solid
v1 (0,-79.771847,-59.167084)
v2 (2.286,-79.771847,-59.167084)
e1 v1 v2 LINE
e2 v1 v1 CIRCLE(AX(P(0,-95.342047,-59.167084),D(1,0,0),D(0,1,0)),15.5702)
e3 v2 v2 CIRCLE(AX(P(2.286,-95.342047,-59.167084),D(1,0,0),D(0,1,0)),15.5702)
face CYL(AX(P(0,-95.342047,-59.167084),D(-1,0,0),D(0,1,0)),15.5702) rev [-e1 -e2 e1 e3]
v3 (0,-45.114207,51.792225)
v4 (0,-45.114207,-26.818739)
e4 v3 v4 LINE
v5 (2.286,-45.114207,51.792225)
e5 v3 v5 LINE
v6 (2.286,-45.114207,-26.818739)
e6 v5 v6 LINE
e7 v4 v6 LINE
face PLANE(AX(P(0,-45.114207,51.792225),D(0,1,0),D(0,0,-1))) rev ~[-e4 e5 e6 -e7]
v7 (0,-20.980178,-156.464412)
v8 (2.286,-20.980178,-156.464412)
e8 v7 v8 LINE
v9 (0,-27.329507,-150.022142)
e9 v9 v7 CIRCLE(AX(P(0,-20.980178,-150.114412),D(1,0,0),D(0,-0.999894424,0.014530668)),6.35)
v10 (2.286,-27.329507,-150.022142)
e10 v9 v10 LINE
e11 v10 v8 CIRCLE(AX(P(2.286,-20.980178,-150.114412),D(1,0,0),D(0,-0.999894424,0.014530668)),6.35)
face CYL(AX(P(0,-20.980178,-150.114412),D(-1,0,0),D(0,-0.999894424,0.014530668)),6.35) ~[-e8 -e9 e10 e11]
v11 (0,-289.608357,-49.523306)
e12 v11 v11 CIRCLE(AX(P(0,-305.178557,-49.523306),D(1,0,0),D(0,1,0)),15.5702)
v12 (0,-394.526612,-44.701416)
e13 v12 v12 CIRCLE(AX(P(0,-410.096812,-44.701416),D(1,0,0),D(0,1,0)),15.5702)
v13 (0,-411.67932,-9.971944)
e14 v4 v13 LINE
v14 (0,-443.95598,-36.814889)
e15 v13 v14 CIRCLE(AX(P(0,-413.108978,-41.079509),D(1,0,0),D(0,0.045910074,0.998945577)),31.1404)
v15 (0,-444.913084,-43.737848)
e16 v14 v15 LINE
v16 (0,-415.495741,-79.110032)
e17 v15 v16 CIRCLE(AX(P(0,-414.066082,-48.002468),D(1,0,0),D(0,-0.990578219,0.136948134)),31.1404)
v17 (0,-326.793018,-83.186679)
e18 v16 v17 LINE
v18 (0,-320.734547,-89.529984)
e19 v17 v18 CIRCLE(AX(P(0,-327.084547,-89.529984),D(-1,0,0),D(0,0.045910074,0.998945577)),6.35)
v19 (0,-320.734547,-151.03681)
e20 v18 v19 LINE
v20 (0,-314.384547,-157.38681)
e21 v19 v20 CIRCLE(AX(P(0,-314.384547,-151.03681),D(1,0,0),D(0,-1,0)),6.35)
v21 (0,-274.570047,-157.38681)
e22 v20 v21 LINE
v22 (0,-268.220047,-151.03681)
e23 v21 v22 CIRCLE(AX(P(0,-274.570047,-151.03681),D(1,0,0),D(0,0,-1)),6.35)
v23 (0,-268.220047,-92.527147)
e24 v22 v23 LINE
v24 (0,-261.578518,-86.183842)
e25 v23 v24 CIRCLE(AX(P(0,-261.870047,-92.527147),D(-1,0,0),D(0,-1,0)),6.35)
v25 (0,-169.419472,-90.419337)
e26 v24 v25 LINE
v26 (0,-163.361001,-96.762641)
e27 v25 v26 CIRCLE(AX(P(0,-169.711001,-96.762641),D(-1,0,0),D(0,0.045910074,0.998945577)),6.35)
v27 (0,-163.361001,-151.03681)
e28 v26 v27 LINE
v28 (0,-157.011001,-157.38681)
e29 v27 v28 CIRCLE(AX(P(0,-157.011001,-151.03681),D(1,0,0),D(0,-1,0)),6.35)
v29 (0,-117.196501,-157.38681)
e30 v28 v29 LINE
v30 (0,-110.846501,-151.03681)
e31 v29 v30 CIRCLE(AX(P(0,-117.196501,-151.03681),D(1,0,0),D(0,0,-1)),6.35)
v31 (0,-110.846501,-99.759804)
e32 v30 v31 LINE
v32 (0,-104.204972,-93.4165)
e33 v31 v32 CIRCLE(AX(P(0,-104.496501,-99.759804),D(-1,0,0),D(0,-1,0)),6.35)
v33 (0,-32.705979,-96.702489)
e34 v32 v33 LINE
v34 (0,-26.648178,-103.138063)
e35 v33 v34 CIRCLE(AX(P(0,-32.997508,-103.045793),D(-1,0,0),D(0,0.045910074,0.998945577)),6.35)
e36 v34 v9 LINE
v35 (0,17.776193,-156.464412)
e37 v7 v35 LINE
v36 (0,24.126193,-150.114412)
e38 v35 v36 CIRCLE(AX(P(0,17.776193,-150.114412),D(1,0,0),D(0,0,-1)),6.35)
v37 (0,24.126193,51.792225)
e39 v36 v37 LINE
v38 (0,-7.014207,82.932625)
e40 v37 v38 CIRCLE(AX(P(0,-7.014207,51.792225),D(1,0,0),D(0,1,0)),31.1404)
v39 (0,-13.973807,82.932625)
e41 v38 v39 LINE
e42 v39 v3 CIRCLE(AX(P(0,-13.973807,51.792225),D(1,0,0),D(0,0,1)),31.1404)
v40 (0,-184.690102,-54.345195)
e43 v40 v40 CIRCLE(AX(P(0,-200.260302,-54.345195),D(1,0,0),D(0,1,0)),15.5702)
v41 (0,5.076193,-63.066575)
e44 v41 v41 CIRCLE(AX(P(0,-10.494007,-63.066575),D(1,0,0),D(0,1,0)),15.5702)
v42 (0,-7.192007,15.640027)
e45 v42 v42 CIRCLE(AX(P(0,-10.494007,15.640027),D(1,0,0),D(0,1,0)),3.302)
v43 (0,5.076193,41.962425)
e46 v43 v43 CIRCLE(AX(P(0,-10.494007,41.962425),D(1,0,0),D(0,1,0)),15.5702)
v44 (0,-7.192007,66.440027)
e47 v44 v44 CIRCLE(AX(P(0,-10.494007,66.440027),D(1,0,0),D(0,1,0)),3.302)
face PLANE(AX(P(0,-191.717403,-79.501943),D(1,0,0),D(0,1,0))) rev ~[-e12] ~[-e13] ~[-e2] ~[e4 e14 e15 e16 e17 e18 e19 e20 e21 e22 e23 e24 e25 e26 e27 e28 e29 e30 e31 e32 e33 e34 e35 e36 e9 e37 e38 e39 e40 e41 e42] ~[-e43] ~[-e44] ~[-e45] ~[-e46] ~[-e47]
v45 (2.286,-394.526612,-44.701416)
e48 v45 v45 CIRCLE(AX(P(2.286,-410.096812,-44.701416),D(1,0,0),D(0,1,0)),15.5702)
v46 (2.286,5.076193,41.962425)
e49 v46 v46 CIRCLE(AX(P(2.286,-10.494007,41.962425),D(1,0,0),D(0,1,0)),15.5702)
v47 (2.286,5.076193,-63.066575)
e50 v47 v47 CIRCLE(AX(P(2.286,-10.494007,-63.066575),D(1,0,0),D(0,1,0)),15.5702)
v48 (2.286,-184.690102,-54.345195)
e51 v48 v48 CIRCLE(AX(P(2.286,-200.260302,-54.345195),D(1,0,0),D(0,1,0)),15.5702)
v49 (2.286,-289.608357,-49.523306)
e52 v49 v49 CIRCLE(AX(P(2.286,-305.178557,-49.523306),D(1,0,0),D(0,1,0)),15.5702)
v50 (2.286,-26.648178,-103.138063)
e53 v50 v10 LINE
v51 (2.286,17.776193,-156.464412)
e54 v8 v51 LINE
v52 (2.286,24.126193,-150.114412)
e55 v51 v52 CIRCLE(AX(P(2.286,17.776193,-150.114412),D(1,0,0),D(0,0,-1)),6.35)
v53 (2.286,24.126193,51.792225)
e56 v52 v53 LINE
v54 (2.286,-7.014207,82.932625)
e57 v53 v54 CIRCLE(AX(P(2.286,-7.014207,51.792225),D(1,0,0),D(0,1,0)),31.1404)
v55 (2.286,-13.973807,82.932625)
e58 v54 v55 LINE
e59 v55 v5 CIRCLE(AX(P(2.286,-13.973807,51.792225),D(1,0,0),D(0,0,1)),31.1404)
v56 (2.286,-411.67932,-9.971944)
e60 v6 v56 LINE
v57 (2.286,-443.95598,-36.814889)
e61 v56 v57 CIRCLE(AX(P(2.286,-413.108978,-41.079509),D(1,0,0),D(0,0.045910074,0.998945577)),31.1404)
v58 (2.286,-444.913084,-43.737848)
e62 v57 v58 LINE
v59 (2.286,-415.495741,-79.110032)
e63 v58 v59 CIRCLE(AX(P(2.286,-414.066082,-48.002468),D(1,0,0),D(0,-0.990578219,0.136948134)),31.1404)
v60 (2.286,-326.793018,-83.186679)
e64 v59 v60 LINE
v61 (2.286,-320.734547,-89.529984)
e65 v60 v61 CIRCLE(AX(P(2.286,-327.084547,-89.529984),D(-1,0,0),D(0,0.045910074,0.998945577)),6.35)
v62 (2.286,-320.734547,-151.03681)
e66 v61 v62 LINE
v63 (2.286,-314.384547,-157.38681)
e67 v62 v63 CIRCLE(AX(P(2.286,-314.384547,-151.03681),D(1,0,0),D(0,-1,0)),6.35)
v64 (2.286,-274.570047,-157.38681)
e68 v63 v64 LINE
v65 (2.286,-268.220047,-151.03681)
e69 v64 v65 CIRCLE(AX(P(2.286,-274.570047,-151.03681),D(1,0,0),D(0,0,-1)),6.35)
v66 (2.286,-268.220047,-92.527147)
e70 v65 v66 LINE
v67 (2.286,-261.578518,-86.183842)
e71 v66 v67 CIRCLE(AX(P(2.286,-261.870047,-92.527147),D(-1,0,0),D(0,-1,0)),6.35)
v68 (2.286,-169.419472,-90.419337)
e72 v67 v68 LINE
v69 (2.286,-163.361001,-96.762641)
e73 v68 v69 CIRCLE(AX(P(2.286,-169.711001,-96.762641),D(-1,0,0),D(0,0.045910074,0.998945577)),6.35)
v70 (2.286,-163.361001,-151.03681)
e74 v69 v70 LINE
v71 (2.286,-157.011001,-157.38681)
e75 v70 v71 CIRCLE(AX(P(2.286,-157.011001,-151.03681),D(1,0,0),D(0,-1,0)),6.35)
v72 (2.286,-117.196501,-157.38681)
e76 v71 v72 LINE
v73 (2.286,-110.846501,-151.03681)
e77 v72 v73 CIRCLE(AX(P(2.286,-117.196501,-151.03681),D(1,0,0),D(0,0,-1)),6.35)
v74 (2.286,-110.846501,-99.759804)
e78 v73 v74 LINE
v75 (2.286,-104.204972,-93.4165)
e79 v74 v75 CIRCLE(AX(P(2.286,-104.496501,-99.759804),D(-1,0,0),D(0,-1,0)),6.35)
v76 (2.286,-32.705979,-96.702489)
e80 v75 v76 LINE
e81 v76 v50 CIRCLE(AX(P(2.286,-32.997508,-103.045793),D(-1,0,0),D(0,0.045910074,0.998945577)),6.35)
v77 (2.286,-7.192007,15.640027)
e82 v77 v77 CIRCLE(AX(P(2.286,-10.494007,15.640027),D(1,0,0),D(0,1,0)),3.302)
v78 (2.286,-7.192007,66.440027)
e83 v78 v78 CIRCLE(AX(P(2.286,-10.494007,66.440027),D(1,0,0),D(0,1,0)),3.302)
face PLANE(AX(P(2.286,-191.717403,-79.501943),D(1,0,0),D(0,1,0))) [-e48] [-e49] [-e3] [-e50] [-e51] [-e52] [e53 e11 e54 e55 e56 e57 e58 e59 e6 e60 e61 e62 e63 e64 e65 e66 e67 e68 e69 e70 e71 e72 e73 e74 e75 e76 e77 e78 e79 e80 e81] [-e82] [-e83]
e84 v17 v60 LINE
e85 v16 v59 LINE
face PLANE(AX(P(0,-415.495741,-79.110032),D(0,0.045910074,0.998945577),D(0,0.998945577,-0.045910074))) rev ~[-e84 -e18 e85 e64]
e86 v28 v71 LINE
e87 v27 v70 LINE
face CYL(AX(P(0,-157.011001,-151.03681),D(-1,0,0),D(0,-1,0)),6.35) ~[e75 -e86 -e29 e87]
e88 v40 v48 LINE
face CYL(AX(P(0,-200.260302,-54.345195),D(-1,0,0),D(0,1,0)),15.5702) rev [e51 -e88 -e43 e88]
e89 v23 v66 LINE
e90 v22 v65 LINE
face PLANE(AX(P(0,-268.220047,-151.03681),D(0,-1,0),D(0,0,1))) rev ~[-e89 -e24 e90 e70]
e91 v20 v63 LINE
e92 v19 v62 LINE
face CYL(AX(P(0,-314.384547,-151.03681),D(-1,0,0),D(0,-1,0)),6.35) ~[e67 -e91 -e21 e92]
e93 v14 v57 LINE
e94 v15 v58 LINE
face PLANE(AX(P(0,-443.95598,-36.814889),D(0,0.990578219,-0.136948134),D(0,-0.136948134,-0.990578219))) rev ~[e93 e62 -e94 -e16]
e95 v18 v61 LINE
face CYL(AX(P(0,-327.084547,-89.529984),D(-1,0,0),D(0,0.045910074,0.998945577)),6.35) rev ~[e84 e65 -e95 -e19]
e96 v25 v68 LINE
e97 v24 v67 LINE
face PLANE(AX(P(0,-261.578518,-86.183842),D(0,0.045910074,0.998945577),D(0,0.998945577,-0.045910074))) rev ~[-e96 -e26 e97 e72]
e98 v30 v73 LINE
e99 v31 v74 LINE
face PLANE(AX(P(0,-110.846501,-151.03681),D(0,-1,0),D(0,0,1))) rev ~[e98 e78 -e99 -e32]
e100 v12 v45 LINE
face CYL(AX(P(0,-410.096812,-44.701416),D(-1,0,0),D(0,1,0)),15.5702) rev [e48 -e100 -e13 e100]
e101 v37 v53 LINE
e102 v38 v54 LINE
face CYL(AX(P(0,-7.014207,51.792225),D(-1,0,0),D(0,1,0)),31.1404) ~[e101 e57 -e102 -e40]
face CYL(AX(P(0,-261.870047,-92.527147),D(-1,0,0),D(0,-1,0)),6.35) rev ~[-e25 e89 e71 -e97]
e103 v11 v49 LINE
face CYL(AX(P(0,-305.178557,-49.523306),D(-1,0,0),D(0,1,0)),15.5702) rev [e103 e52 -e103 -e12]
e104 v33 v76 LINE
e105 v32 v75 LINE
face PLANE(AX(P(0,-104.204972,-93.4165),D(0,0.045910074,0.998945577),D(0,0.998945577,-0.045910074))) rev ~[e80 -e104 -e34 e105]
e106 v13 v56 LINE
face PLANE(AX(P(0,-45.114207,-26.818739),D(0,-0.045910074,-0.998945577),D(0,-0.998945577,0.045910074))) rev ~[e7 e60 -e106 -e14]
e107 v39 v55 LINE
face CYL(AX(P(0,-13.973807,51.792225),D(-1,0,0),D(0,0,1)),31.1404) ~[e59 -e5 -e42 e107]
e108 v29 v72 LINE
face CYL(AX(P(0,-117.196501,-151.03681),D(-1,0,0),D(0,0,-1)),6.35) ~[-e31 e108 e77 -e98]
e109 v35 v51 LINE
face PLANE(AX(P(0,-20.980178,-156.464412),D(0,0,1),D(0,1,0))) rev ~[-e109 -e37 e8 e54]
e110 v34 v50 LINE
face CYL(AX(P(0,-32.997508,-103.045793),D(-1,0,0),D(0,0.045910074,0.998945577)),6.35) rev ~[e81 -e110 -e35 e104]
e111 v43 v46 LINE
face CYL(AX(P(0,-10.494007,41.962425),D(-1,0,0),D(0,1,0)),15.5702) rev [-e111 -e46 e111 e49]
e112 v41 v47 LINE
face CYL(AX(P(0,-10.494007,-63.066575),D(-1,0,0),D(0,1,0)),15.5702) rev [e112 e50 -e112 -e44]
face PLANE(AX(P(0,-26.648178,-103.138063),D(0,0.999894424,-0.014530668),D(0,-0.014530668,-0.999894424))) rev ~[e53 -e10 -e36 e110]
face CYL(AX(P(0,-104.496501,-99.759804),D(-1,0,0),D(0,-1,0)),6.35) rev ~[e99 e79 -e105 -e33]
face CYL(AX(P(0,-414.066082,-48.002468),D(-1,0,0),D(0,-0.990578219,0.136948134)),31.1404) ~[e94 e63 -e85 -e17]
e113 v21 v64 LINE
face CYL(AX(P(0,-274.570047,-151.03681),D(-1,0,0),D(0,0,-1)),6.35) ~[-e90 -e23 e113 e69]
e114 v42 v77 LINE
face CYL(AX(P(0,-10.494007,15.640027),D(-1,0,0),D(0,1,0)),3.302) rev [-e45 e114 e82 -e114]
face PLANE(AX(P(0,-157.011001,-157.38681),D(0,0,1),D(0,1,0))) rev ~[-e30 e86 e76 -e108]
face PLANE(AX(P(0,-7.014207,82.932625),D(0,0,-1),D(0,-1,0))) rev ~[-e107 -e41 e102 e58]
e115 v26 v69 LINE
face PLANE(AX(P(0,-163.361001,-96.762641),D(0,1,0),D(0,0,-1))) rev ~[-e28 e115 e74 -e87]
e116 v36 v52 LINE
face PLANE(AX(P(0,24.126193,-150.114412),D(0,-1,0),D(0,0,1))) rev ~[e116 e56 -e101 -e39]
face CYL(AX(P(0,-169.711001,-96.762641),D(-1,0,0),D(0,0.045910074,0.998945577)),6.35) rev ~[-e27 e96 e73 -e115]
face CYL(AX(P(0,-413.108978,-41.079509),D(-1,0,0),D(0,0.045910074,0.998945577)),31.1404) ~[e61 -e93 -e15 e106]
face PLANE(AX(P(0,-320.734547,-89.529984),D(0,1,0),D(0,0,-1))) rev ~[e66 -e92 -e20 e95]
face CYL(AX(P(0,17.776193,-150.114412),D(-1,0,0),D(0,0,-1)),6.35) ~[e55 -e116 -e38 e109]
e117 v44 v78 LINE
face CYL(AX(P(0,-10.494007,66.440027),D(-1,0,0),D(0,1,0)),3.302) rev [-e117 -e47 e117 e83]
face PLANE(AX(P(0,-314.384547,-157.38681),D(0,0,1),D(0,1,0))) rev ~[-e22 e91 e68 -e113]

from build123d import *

# Parameters (mm, degrees)
F0_R     = 15.5702
F0_R_2   = 3.302
F1_DEPTH = 2.286


# Not quite as in the source:
# - a feature names something its author has since deleted; it is built from what else it names


with BuildPart() as f1:
    # F0 (on Right) → F1 (new body)
    with BuildSketch(Plane.YZ):
        with BuildLine():
            Line((-45.1142073236, -26.818738899), (-411.6793204181, -9.9719436831))
            ThreePointArc((-411.6793204181, -9.9719436831), (-433.0208080629, -17.1370033148), (-443.9559804746, -36.8148888401))
            Line((-443.9559804746, -36.8148888401), (-444.9130844184, -43.7378478567))
            ThreePointArc((-444.9130844184, -43.7378478567), (-438.0085876413, -67.9142971029), (-415.4957405146, -79.1100323691))
            Line((-415.4957405146, -79.1100323691), (-326.7930180723, -83.186679455))
            ThreePointArc((-326.7930180723, -83.186679455), (-322.4925045261, -85.1441378233), (-320.7345470438, -89.5299838666))
            Line((-320.7345470438, -89.5299838666), (-320.7345470438, -151.0368096017))
            ThreePointArc((-320.7345470438, -151.0368096017), (-318.8746751043, -155.5269376622), (-314.3845470438, -157.3868096017))
            Line((-314.3845470438, -157.3868096017), (-274.5700470438, -157.3868096017))
            ThreePointArc((-274.5700470438, -157.3868096017), (-270.0799189833, -155.5269376622), (-268.2200470438, -151.0368096017))
            Line((-268.2200470438, -151.0368096017), (-268.2200470438, -92.5271466826))
            ThreePointArc((-268.2200470438, -92.5271466826), (-266.2558930871, -87.9351041649), (-261.5785180723, -86.183842271))
            Line((-261.5785180723, -86.183842271), (-169.4194716536, -90.4193369398))
            ThreePointArc((-169.4194716536, -90.4193369398), (-165.1189581074, -92.3767953082), (-163.3610006251, -96.7626413515))
            Line((-163.3610006251, -96.7626413515), (-163.3610006251, -151.0368096017))
            ThreePointArc((-163.3610006251, -151.0368096017), (-161.5011286857, -155.5269376622), (-157.0110006251, -157.3868096017))
            Line((-157.0110006251, -157.3868096017), (-117.1965006251, -157.3868096017))
            ThreePointArc((-117.1965006251, -157.3868096017), (-112.7063725646, -155.5269376622), (-110.8465006251, -151.0368096017))
            Line((-110.8465006251, -151.0368096017), (-110.8465006251, -99.7598041674))
            ThreePointArc((-110.8465006251, -99.7598041674), (-108.8823466684, -95.1677616497), (-104.2049716536, -93.4164997558))
            Line((-104.2049716536, -93.4164997558), (-32.7059788978, -96.7024886458))
            ThreePointArc((-32.7059788978, -96.7024886458), (-28.3737210787, -98.6934263777), (-26.6481782752, -103.1380627967))
            Line((-26.6481782752, -103.1380627967), (-27.3295071805, -150.0221421965))
            ThreePointArc((-27.3295071805, -150.0221421965), (-25.5028102734, -154.5717983424), (-20.9801775863, -156.4644119358))
            Line((-20.9801775863, -156.4644119358), (17.7761926764, -156.4644119358))
            ThreePointArc((17.7761926764, -156.4644119358), (22.266320737, -154.6045399963), (24.1261926764, -150.1144119358))
            Line((24.1261926764, -150.1144119358), (24.1261926764, -99.3144119358))
            Line((24.1261926764, -99.3144119358), (24.1261926764, -36.0657921419))
            ThreePointArc((24.1261926764, -36.0657921419), (22.3682351942, -31.6799460986), (18.0677216479, -29.7224877302))
            Line((18.0677216479, -29.7224877302), (-45.1142073236, -26.818738899))
        make_face()
        with Locations((-410.0968120394, -44.7014163277)):
            Circle(F0_R, mode=Mode.SUBTRACT)
        with Locations((-305.1785570708, -49.5233055166)):
            Circle(F0_R, mode=Mode.SUBTRACT)
        with Locations((-200.2603021023, -54.3451947055)):
            Circle(F0_R, mode=Mode.SUBTRACT)
        with Locations((-95.3420471337, -59.1670838944)):
            Circle(F0_R, mode=Mode.SUBTRACT)
        with Locations((-10.4940073236, -63.0665754174)):
            Circle(F0_R, mode=Mode.SUBTRACT)
        with BuildLine():
            Line((-45.1142073236, 51.7922245826), (-45.1142073236, -26.818738899))
            Line((-45.1142073236, -26.818738899), (18.0677216479, -29.7224877302))
            Line((18.0677216479, -29.7224877302), (24.1261926764, -30.000926177))
            Line((24.1261926764, -30.000926177), (24.1261926764, 51.7922245826))
            ThreePointArc((24.1261926764, 51.7922245826), (15.0053806853, 73.8118125915), (-7.0142073236, 82.9326245826))
            Line((-7.0142073236, 82.9326245826), (-13.9738073236, 82.9326245826))
            ThreePointArc((-13.9738073236, 82.9326245826), (-35.9933953324, 73.8118125915), (-45.1142073236, 51.7922245826))
        make_face()
        with Locations((-10.4940073236, 15.6400269167)):
            Circle(F0_R_2, mode=Mode.SUBTRACT)
        with Locations((-10.4940073236, 41.9624245826)):
            Circle(F0_R, mode=Mode.SUBTRACT)
        with Locations((-10.4940073236, 66.4400269167)):
            Circle(F0_R_2, mode=Mode.SUBTRACT)
        with BuildLine():
            Line((24.1261926764, -30.000926177), (18.0677216479, -29.7224877302))
            ThreePointArc((18.0677216479, -29.7224877302), (22.3682351942, -31.6799460986), (24.1261926764, -36.0657921419))
            Line((24.1261926764, -36.0657921419), (24.1261926764, -30.000926177))
        make_face()
    extrude(amount=F1_DEPTH)


solid = f1.part
